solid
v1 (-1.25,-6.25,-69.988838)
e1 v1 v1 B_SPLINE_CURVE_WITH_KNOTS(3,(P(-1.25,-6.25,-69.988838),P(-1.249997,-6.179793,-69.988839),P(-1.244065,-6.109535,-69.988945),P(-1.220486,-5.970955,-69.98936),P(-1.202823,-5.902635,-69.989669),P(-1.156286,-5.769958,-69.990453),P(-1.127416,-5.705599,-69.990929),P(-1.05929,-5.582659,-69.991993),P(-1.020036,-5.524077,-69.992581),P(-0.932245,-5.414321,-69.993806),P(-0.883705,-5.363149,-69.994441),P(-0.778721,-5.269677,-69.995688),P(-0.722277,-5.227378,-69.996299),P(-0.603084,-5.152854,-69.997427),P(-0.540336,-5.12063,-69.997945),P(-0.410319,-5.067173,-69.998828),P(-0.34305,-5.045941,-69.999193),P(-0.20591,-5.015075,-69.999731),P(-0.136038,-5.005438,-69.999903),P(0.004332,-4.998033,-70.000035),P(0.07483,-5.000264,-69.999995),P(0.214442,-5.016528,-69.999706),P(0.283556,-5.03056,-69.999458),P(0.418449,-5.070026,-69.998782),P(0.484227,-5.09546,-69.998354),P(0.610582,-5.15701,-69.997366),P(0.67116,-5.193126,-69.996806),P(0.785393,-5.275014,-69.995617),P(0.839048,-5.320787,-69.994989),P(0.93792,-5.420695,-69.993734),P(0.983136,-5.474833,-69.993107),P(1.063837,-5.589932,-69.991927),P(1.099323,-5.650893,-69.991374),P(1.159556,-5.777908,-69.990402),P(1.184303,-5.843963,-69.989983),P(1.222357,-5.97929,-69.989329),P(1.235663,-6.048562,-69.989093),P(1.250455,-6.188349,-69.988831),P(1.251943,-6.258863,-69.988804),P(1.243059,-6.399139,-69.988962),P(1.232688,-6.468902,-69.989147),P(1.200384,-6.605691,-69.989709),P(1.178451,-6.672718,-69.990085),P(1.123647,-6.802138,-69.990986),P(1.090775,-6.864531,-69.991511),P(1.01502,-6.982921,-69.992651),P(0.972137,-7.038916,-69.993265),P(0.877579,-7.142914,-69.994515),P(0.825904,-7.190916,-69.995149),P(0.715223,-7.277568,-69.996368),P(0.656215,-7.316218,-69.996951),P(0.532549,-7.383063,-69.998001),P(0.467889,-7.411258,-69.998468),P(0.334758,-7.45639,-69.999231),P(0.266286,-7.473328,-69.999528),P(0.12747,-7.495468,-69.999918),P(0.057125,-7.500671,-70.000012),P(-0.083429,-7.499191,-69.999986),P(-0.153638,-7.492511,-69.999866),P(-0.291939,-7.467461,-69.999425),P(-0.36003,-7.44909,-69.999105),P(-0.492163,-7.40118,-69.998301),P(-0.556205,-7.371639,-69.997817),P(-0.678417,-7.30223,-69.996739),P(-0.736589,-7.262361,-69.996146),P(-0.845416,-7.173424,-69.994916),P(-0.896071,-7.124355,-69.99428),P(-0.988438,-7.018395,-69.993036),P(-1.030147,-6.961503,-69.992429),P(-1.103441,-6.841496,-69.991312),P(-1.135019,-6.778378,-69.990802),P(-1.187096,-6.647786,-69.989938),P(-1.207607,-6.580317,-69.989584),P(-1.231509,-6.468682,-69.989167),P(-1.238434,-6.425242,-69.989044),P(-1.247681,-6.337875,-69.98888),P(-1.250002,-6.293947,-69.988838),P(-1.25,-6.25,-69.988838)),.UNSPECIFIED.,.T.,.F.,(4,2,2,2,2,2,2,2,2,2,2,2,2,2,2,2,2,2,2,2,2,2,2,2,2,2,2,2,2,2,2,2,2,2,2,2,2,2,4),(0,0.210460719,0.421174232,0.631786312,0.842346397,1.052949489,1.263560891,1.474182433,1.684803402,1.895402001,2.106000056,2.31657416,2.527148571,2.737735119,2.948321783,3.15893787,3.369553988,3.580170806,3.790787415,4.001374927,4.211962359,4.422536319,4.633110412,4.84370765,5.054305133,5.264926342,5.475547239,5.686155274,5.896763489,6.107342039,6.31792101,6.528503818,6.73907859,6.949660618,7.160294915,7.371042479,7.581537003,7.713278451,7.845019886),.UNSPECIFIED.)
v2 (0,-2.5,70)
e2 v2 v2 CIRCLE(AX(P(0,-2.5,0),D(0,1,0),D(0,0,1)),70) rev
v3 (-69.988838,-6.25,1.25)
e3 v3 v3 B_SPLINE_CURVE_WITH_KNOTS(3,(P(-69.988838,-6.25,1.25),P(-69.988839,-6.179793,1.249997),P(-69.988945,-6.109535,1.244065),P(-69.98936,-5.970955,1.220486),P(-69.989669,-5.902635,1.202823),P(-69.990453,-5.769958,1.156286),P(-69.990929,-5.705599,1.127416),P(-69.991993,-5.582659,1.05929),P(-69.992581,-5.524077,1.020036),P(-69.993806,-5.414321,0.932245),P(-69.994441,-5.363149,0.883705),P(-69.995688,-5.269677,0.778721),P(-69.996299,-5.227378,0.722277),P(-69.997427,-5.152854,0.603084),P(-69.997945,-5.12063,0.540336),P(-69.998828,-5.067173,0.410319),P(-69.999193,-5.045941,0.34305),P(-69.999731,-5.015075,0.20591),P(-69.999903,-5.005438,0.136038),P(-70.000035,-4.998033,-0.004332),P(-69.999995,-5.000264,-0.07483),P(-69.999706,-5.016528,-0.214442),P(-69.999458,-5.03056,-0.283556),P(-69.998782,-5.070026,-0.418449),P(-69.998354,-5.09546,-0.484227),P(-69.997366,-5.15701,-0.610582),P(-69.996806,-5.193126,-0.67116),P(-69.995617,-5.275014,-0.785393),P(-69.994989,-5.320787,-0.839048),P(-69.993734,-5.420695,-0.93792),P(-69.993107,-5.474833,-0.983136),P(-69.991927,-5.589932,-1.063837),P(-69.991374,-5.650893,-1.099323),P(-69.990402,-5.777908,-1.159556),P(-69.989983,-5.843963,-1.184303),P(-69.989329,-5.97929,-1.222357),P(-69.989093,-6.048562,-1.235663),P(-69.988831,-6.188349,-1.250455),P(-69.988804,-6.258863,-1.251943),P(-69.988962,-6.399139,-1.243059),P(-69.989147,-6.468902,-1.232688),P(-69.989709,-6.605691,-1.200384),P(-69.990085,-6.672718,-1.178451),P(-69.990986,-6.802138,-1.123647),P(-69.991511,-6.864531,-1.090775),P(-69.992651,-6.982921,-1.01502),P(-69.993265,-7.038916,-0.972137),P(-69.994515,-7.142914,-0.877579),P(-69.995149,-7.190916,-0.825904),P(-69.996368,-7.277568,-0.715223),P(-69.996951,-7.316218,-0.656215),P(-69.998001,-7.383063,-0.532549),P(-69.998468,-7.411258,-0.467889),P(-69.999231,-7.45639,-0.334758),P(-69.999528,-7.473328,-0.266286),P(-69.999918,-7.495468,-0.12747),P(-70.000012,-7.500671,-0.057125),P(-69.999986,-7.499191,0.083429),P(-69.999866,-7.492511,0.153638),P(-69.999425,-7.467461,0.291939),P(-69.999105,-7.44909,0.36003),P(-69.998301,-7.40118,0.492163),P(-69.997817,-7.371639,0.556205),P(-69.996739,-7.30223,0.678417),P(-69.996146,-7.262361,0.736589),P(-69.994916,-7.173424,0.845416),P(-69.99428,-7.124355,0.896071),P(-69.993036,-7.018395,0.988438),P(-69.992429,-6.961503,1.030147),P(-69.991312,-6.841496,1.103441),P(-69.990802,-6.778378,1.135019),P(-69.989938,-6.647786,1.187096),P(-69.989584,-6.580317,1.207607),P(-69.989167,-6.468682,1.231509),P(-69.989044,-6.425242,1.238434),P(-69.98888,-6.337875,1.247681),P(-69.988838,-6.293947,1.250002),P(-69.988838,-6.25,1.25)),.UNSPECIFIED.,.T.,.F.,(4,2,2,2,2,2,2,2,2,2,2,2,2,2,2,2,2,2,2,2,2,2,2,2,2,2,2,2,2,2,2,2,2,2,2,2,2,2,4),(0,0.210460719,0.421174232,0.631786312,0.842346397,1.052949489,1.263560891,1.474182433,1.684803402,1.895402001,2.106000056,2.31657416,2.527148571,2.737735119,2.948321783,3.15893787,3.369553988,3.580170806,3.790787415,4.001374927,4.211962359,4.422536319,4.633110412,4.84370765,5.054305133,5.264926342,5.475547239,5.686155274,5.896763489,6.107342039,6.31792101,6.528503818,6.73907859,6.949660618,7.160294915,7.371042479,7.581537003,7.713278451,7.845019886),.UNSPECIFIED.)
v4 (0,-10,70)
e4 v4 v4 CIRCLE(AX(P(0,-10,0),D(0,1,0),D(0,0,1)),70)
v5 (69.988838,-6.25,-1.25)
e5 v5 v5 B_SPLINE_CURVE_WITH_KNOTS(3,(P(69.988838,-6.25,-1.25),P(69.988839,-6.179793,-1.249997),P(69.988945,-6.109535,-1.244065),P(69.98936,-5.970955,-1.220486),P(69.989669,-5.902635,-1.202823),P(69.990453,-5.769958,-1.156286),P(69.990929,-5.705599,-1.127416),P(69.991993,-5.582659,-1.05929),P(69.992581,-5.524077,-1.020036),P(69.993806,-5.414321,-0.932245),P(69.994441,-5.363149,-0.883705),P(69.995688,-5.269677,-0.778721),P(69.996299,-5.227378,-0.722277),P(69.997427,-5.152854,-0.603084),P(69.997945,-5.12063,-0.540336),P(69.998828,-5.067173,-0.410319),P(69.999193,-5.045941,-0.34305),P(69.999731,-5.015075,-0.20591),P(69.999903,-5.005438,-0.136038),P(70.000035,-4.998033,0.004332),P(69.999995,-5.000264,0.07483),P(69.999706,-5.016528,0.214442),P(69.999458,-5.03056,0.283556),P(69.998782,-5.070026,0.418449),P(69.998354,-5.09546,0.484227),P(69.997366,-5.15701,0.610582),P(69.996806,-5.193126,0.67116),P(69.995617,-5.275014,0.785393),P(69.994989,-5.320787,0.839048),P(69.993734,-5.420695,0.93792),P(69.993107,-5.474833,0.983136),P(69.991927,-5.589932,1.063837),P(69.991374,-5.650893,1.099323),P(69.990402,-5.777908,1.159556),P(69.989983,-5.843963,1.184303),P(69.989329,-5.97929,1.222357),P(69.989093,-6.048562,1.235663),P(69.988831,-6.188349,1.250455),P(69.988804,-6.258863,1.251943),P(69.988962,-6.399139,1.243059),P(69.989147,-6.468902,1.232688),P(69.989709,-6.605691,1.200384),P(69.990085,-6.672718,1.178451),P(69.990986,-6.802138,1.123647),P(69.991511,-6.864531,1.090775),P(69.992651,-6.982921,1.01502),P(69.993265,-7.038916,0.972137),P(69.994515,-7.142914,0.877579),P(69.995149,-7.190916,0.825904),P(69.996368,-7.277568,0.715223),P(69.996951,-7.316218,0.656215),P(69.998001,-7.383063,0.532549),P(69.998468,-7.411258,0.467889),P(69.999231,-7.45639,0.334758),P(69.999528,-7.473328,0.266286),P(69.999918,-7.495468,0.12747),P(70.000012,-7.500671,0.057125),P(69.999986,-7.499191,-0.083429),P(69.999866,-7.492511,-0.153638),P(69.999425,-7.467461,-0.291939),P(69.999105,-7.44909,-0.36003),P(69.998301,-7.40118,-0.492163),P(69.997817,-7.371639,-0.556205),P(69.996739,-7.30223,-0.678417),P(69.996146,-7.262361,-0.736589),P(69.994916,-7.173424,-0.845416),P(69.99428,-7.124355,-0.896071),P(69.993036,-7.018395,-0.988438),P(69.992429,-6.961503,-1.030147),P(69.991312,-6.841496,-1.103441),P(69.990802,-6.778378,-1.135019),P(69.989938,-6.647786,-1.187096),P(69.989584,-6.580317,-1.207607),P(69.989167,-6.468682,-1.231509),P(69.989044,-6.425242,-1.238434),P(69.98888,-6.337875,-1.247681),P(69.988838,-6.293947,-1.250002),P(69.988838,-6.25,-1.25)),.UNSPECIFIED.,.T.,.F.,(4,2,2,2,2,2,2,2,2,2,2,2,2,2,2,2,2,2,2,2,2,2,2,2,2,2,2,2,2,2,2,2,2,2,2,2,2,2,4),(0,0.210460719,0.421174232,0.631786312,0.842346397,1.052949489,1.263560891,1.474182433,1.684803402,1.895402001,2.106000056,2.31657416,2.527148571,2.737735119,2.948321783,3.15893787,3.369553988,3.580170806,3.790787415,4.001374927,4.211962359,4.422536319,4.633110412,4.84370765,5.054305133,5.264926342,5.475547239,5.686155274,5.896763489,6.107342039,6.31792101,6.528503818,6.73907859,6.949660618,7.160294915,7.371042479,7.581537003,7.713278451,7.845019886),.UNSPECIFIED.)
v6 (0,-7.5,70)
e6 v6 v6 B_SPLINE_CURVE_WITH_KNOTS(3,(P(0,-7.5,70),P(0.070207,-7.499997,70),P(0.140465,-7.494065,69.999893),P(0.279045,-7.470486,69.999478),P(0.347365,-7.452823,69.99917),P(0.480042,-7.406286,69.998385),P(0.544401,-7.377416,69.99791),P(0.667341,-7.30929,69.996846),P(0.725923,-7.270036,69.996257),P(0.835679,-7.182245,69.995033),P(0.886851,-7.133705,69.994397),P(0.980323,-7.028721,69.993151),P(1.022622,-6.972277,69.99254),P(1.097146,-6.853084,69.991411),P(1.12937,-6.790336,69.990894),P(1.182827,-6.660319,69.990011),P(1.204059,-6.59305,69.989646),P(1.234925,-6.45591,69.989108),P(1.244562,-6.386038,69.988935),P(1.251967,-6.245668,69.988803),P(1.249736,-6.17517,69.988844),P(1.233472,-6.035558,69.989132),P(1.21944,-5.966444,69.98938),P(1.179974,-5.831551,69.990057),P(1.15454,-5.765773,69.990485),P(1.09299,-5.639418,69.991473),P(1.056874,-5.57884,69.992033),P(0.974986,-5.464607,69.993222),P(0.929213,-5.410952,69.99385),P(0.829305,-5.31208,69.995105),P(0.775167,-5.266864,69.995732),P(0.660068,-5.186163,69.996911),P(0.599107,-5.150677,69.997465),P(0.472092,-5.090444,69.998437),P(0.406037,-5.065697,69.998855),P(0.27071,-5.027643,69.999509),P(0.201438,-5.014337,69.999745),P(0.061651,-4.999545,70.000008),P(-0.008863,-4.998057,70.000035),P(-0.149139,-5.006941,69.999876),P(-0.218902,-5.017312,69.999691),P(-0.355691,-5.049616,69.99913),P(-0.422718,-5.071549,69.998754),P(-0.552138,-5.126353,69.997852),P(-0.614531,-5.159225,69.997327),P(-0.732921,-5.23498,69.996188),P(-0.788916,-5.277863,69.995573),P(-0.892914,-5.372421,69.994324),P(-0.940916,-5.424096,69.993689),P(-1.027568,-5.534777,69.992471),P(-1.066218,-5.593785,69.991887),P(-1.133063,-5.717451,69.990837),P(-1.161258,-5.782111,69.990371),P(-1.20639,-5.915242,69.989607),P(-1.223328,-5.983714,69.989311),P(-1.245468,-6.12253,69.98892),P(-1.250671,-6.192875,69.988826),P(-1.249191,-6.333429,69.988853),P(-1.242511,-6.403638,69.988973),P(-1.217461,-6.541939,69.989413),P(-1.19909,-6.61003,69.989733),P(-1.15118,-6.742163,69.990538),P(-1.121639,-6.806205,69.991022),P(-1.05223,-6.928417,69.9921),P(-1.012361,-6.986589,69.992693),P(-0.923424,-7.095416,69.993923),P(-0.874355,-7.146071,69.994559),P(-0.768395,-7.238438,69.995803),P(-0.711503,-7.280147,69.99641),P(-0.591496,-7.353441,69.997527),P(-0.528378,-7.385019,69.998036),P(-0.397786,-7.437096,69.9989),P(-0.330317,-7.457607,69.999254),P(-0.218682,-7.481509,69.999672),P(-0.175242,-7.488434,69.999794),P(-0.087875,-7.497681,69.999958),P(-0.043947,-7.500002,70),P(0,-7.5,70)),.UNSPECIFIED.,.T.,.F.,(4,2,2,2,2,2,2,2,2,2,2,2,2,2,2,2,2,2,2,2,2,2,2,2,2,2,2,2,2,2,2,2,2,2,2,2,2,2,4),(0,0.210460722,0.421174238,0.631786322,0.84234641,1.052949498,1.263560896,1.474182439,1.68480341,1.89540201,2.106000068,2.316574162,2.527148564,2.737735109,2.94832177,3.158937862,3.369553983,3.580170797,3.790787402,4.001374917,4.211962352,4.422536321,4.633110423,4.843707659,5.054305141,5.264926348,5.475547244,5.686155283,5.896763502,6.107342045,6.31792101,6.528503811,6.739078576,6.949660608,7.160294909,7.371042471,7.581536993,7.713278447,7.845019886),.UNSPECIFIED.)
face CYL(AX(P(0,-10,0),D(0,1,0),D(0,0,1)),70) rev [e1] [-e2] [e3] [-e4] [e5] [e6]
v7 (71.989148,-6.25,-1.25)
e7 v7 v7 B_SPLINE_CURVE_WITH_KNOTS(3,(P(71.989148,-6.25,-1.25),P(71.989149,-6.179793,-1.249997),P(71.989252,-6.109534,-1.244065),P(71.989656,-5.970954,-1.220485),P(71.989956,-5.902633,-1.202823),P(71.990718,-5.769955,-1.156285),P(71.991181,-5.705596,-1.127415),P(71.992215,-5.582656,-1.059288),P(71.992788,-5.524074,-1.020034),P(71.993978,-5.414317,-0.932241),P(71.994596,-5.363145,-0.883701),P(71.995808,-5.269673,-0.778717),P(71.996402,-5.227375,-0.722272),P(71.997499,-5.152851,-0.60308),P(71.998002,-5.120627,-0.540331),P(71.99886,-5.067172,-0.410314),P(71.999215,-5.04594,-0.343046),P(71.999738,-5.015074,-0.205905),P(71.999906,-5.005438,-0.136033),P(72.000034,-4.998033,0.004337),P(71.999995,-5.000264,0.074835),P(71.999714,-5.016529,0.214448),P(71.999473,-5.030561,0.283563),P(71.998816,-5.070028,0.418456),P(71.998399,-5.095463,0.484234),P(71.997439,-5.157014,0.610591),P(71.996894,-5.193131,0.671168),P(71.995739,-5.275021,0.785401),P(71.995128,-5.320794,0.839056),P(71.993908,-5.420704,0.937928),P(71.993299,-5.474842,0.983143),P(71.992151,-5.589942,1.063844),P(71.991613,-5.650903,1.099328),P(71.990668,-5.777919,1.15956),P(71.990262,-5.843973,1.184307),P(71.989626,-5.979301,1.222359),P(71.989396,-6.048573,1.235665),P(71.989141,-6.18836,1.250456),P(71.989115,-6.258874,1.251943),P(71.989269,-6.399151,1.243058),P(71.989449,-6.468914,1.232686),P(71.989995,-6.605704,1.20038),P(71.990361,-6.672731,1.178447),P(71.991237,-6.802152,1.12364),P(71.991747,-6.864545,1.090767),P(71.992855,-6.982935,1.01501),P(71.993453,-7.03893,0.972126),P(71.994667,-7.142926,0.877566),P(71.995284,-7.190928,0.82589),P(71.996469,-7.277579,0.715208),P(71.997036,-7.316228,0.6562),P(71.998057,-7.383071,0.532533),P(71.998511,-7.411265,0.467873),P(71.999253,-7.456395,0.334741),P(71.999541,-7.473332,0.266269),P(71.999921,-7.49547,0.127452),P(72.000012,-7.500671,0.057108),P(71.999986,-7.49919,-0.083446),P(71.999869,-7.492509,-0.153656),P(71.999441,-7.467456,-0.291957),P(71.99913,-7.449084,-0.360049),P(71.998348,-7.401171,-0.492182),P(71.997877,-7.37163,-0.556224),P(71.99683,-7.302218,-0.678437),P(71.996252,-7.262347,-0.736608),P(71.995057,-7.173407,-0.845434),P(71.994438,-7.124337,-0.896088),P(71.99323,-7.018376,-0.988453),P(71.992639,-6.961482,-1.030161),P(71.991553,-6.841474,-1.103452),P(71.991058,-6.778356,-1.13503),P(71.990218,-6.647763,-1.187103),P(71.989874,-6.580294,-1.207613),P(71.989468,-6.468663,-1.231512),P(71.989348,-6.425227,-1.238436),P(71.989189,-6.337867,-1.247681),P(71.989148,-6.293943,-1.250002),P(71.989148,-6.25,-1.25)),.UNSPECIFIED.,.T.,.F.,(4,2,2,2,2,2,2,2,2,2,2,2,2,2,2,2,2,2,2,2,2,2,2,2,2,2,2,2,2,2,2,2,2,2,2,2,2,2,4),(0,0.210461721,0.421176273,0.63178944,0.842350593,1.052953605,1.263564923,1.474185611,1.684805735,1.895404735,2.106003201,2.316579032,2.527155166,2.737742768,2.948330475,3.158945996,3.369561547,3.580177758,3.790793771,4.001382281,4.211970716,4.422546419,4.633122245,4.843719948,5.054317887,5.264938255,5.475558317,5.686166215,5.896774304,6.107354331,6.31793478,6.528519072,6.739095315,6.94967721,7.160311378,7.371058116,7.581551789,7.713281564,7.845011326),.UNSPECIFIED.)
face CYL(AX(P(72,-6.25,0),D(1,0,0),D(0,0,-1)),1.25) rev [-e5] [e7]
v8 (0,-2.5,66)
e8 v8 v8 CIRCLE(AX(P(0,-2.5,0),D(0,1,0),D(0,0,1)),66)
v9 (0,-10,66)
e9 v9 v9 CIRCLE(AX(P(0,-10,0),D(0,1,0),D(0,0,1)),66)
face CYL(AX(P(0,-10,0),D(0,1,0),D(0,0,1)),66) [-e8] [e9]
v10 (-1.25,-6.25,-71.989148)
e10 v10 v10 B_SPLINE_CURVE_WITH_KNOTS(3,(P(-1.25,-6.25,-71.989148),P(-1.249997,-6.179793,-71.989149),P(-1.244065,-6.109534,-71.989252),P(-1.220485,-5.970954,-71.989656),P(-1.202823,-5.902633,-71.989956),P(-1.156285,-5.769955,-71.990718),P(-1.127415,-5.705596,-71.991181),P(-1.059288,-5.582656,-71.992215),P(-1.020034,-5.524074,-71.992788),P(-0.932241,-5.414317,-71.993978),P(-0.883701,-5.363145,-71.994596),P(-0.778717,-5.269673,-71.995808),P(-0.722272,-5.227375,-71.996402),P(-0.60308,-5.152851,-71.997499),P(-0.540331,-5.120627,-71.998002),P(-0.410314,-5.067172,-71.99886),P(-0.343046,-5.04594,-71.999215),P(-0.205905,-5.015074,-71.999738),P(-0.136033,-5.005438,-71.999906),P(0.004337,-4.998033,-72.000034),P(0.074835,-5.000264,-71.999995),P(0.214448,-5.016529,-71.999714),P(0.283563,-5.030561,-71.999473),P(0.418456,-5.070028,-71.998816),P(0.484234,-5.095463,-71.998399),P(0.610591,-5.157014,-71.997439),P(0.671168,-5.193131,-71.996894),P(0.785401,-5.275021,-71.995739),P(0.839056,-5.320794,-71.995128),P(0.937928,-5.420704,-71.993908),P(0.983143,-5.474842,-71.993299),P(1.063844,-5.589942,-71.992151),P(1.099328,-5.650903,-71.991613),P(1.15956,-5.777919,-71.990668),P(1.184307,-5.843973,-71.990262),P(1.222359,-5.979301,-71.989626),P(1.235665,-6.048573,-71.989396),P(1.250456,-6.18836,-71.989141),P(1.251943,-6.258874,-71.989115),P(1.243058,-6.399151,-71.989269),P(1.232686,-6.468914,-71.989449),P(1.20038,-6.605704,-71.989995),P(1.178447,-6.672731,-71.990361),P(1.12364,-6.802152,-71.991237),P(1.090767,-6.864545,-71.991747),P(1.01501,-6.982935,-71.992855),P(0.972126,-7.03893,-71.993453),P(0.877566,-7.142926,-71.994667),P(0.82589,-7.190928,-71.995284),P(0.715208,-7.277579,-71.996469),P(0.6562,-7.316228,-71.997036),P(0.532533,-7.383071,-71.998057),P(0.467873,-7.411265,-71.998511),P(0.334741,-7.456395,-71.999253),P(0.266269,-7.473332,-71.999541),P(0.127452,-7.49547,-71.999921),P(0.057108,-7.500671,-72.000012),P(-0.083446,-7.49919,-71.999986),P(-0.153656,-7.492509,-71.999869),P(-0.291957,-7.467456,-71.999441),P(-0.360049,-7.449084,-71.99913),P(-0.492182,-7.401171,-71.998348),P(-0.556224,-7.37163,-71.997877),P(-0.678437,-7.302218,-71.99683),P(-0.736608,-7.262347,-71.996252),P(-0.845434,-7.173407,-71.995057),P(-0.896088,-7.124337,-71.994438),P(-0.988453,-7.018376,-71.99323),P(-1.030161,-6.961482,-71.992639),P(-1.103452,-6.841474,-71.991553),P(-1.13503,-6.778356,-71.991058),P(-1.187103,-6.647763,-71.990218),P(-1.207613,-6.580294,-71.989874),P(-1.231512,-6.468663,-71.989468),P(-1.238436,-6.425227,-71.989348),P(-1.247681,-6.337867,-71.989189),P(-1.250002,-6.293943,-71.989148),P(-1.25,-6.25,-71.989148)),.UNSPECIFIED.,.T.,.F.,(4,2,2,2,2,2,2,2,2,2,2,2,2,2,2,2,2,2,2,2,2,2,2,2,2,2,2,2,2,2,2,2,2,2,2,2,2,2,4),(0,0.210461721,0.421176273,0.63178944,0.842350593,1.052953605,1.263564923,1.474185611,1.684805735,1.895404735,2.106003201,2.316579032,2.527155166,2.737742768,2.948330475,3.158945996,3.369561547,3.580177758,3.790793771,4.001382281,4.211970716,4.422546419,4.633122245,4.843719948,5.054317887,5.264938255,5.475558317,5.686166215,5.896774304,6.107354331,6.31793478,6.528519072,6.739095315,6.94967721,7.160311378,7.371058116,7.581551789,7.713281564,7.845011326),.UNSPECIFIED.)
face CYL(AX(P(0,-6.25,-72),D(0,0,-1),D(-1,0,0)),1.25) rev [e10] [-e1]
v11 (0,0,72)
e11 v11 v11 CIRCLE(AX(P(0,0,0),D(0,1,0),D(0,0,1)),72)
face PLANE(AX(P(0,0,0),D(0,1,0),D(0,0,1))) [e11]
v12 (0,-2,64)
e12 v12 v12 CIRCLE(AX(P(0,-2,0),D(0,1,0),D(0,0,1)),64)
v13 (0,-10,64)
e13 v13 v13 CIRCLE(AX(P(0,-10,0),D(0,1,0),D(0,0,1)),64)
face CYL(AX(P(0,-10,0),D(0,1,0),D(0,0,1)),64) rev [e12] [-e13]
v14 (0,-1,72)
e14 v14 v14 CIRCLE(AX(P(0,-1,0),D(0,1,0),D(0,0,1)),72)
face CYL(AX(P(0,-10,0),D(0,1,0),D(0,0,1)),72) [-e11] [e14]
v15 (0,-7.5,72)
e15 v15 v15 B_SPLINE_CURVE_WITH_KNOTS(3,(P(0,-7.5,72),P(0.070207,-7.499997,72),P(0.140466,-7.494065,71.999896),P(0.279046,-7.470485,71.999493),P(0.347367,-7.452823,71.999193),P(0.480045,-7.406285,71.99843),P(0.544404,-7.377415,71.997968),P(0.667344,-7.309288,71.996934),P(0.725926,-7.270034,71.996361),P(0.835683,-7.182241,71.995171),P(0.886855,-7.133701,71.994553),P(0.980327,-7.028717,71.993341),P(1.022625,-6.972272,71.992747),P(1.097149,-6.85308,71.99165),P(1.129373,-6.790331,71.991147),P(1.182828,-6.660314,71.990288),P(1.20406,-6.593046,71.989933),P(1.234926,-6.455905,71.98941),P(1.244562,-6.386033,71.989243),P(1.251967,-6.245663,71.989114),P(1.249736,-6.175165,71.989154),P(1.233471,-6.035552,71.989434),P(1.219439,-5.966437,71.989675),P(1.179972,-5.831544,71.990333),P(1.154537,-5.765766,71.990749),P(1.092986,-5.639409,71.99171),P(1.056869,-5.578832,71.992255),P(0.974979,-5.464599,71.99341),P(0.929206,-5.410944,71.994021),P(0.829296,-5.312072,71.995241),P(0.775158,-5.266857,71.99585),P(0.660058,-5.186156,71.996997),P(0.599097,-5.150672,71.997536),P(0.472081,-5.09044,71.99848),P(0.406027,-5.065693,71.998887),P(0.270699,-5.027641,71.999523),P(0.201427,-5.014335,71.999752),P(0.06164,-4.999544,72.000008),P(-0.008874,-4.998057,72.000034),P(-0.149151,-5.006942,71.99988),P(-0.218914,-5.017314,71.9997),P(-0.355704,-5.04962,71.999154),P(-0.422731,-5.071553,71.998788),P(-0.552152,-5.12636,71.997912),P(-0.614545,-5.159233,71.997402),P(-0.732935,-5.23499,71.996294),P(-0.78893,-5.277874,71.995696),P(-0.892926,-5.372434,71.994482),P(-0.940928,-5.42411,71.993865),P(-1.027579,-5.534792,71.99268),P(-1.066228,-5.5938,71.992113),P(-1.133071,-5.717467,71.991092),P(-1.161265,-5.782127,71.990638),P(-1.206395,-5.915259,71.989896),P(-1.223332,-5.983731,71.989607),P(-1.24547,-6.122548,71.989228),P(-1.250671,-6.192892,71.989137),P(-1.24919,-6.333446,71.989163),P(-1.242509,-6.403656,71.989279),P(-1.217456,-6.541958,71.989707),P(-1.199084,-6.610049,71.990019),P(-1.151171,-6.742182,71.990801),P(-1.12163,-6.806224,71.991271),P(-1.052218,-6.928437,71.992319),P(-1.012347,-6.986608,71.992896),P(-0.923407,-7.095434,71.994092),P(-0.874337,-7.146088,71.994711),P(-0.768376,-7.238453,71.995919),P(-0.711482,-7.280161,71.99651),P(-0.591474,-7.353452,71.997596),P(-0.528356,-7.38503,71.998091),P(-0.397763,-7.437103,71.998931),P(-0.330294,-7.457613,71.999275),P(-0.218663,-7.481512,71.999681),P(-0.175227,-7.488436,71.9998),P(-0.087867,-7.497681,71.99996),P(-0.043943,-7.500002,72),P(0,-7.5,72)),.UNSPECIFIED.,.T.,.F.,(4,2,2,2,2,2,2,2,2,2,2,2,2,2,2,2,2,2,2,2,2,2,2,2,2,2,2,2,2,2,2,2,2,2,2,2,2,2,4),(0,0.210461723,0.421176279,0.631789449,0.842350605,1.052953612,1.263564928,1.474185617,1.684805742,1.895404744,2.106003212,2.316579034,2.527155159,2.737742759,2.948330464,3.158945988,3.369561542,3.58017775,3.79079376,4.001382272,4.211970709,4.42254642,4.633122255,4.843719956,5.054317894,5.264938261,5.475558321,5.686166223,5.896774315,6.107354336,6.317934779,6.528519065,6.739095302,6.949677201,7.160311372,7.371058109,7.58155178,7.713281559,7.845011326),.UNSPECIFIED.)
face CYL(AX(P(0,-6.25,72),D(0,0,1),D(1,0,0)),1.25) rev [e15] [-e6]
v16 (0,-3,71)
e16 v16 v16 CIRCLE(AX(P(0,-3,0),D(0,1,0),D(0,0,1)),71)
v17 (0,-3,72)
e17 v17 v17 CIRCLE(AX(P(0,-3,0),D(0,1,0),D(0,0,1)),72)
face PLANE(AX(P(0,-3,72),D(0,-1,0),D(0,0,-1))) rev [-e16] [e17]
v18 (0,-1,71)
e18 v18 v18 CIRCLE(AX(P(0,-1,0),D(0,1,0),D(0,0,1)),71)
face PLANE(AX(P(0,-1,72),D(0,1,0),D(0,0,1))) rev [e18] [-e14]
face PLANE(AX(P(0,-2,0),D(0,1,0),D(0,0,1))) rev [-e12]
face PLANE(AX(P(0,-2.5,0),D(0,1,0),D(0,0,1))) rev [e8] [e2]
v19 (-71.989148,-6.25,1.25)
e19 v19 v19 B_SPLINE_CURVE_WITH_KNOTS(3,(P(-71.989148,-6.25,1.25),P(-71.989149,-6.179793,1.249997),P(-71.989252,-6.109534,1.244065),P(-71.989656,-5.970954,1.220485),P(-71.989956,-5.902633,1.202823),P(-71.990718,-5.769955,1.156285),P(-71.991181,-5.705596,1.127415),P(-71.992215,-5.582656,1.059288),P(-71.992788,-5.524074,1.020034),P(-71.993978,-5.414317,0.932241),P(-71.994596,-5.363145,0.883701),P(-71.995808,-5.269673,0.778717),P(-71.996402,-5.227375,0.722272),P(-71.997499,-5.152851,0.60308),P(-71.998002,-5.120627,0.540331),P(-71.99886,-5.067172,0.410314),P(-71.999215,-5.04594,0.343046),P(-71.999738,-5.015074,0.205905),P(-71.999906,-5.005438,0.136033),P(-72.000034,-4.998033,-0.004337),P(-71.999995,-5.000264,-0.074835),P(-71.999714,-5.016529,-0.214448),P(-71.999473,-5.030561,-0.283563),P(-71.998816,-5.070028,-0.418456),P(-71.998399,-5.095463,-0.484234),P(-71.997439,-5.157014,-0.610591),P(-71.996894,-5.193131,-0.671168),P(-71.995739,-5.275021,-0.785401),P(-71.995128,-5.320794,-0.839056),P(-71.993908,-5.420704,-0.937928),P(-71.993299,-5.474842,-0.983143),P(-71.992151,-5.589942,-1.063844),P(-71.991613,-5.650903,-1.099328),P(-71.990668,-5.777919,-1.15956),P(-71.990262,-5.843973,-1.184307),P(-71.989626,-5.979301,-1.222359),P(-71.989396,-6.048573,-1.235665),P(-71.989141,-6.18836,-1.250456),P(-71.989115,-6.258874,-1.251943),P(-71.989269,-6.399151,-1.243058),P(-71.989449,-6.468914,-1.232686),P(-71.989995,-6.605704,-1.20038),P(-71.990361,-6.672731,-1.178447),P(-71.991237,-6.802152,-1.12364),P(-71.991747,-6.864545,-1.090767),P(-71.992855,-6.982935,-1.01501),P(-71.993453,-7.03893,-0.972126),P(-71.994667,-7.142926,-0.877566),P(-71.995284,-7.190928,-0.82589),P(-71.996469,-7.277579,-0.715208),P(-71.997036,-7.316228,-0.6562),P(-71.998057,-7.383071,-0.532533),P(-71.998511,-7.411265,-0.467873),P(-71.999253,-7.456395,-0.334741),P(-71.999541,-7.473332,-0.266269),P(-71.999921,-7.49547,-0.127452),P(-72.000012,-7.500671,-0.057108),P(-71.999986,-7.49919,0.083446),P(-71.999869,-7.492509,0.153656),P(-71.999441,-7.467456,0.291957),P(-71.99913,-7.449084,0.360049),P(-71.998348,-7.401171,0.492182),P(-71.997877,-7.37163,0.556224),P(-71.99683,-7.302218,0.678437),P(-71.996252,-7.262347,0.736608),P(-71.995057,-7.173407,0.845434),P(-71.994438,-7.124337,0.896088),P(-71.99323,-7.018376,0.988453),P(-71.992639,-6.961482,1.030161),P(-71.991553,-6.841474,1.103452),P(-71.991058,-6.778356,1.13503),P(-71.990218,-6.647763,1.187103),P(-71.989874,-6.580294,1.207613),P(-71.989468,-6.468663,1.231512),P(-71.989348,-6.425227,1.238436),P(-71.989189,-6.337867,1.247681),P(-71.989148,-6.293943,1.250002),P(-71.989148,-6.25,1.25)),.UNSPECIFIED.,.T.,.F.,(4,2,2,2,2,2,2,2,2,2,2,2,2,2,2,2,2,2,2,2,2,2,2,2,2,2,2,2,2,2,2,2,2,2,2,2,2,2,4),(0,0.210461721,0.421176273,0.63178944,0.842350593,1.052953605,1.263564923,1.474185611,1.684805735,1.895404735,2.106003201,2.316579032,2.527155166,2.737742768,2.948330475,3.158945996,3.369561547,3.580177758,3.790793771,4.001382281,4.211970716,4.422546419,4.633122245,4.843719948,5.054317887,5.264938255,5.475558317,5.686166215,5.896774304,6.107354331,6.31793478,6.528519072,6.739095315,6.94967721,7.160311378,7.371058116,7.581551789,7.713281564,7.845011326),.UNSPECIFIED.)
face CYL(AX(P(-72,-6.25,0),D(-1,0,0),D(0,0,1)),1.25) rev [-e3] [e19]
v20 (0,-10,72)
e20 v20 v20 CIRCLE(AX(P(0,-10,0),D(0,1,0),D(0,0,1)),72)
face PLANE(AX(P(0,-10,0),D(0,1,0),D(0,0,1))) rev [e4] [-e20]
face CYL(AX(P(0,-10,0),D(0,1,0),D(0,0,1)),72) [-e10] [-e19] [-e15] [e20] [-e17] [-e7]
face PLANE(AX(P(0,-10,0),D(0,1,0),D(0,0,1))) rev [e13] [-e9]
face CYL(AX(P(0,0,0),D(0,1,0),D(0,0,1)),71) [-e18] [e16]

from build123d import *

# Parameters (mm, degrees)
SKETCH_9_R               = 72
SKETCH_9_R_2             = 70
EXTRUDE_9_DEPTH          = 10
SKETCH_9_18_R            = 70
SKETCH_9_18_R_2          = 66
EXTRUDE_10_DEPTH         = 2.5
SKETCH_9_19_R            = 66
EXTRUDE_11_DEPTH         = 10
SHELL_START              = -10
SHELL_2_OUTLINE_R        = 64
SHELL_2_DEPTH            = 8
F_2_5MM_1_REACH          = 163.118
F_2_5MM_1_BORE_R         = 1.25
PATTERN_CIRCULAR_1_COUNT = 4
SKETCH_15_W              = 1
SKETCH_15_H              = 2


# Read off the part's stored shape, not the designer's step: 薄殼2
with BuildPart() as part:
    # 草圖9 → 填料-伸長9 (new body)
    with BuildSketch(Plane(origin=(0, 0, 0), x_dir=(1, 0, 0), z_dir=(0, 1, 0))):
        with Locations(Location((0, 0, 0), (0, 0, 270))):
            Circle(SKETCH_9_R)
        with Locations(Location((0, 0, 0), (0, 0, 270))):
            Circle(SKETCH_9_R_2, mode=Mode.SUBTRACT)
    extrude(amount=-EXTRUDE_9_DEPTH)

    # 草圖9<18> → 填料-伸長10 (add)
    with BuildSketch(Plane(origin=(0, 0, 0), x_dir=(1, 0, 0), z_dir=(0, 1, 0))):
        with Locations(Location((0, 0, 0), (0, 0, 270))):
            Circle(SKETCH_9_18_R)
        with Locations(Location((0, 0, 0), (0, 0, 270))):
            Circle(SKETCH_9_18_R_2, mode=Mode.SUBTRACT)
    extrude(amount=-EXTRUDE_10_DEPTH)

    # 草圖9<19> → 填料-伸長11 (add)
    with BuildSketch(Plane(origin=(0, 0, 0), x_dir=(1, 0, 0), z_dir=(0, 1, 0))):
        with Locations(Location((0, 0, 0), (0, 0, 270))):
            Circle(SKETCH_9_19_R)
    extrude(amount=-EXTRUDE_11_DEPTH)

    # 薄殼2 outline → 薄殼2 (cut)
    with BuildSketch(Plane(origin=(0, 0, 0), x_dir=(1, 0, 0), z_dir=(0, 1, 0)).offset(SHELL_START)):
        Circle(SHELL_2_OUTLINE_R)
    extrude(amount=SHELL_2_DEPTH, mode=Mode.SUBTRACT)

    # Ø2.5mm 定位孔1 bore (on position points) → Ø2.5mm 定位孔1 (cut, up to next)
    with BuildSketch(Plane(origin=(0, -6.25, 72), x_dir=(1, 0, 0), z_dir=(0, 0, 1)), mode=Mode.PRIVATE) as f_2_5mm_1_sk1:
        Circle(F_2_5MM_1_BORE_R)
    f_2_5mm_1_tool1 = extrude(f_2_5mm_1_sk1.sketch, amount=-F_2_5MM_1_REACH, mode=Mode.PRIVATE) & part.part
    f_2_5mm_1 = f_2_5mm_1_tool1.solids().sort_by_distance((0, -6.25, 72))[0]
    add(f_2_5mm_1, mode=Mode.SUBTRACT)

    # 環狀複製排列1: Ø2.5mm 定位孔1 ×4 about axis
    pattern_circular_1_axis = Axis((0, -10, 0), (0, 1, 0))
    for i in range(1, PATTERN_CIRCULAR_1_COUNT):
        add(f_2_5mm_1.rotate(pattern_circular_1_axis, i * 360 / PATTERN_CIRCULAR_1_COUNT), mode=Mode.SUBTRACT)

    # 草圖15 → 除料-旋轉2 (revolve, cut)
    with BuildSketch(Plane(origin=(0, 0, 0), x_dir=(0, 0, -1), z_dir=(1, 0, 0))):
        with Locations((-71.5, -2)):
            Rectangle(SKETCH_15_W, SKETCH_15_H)
    revolve(axis=Axis((0, 0, 0), (0, -1, 0)), mode=Mode.SUBTRACT)


solid = part.part
